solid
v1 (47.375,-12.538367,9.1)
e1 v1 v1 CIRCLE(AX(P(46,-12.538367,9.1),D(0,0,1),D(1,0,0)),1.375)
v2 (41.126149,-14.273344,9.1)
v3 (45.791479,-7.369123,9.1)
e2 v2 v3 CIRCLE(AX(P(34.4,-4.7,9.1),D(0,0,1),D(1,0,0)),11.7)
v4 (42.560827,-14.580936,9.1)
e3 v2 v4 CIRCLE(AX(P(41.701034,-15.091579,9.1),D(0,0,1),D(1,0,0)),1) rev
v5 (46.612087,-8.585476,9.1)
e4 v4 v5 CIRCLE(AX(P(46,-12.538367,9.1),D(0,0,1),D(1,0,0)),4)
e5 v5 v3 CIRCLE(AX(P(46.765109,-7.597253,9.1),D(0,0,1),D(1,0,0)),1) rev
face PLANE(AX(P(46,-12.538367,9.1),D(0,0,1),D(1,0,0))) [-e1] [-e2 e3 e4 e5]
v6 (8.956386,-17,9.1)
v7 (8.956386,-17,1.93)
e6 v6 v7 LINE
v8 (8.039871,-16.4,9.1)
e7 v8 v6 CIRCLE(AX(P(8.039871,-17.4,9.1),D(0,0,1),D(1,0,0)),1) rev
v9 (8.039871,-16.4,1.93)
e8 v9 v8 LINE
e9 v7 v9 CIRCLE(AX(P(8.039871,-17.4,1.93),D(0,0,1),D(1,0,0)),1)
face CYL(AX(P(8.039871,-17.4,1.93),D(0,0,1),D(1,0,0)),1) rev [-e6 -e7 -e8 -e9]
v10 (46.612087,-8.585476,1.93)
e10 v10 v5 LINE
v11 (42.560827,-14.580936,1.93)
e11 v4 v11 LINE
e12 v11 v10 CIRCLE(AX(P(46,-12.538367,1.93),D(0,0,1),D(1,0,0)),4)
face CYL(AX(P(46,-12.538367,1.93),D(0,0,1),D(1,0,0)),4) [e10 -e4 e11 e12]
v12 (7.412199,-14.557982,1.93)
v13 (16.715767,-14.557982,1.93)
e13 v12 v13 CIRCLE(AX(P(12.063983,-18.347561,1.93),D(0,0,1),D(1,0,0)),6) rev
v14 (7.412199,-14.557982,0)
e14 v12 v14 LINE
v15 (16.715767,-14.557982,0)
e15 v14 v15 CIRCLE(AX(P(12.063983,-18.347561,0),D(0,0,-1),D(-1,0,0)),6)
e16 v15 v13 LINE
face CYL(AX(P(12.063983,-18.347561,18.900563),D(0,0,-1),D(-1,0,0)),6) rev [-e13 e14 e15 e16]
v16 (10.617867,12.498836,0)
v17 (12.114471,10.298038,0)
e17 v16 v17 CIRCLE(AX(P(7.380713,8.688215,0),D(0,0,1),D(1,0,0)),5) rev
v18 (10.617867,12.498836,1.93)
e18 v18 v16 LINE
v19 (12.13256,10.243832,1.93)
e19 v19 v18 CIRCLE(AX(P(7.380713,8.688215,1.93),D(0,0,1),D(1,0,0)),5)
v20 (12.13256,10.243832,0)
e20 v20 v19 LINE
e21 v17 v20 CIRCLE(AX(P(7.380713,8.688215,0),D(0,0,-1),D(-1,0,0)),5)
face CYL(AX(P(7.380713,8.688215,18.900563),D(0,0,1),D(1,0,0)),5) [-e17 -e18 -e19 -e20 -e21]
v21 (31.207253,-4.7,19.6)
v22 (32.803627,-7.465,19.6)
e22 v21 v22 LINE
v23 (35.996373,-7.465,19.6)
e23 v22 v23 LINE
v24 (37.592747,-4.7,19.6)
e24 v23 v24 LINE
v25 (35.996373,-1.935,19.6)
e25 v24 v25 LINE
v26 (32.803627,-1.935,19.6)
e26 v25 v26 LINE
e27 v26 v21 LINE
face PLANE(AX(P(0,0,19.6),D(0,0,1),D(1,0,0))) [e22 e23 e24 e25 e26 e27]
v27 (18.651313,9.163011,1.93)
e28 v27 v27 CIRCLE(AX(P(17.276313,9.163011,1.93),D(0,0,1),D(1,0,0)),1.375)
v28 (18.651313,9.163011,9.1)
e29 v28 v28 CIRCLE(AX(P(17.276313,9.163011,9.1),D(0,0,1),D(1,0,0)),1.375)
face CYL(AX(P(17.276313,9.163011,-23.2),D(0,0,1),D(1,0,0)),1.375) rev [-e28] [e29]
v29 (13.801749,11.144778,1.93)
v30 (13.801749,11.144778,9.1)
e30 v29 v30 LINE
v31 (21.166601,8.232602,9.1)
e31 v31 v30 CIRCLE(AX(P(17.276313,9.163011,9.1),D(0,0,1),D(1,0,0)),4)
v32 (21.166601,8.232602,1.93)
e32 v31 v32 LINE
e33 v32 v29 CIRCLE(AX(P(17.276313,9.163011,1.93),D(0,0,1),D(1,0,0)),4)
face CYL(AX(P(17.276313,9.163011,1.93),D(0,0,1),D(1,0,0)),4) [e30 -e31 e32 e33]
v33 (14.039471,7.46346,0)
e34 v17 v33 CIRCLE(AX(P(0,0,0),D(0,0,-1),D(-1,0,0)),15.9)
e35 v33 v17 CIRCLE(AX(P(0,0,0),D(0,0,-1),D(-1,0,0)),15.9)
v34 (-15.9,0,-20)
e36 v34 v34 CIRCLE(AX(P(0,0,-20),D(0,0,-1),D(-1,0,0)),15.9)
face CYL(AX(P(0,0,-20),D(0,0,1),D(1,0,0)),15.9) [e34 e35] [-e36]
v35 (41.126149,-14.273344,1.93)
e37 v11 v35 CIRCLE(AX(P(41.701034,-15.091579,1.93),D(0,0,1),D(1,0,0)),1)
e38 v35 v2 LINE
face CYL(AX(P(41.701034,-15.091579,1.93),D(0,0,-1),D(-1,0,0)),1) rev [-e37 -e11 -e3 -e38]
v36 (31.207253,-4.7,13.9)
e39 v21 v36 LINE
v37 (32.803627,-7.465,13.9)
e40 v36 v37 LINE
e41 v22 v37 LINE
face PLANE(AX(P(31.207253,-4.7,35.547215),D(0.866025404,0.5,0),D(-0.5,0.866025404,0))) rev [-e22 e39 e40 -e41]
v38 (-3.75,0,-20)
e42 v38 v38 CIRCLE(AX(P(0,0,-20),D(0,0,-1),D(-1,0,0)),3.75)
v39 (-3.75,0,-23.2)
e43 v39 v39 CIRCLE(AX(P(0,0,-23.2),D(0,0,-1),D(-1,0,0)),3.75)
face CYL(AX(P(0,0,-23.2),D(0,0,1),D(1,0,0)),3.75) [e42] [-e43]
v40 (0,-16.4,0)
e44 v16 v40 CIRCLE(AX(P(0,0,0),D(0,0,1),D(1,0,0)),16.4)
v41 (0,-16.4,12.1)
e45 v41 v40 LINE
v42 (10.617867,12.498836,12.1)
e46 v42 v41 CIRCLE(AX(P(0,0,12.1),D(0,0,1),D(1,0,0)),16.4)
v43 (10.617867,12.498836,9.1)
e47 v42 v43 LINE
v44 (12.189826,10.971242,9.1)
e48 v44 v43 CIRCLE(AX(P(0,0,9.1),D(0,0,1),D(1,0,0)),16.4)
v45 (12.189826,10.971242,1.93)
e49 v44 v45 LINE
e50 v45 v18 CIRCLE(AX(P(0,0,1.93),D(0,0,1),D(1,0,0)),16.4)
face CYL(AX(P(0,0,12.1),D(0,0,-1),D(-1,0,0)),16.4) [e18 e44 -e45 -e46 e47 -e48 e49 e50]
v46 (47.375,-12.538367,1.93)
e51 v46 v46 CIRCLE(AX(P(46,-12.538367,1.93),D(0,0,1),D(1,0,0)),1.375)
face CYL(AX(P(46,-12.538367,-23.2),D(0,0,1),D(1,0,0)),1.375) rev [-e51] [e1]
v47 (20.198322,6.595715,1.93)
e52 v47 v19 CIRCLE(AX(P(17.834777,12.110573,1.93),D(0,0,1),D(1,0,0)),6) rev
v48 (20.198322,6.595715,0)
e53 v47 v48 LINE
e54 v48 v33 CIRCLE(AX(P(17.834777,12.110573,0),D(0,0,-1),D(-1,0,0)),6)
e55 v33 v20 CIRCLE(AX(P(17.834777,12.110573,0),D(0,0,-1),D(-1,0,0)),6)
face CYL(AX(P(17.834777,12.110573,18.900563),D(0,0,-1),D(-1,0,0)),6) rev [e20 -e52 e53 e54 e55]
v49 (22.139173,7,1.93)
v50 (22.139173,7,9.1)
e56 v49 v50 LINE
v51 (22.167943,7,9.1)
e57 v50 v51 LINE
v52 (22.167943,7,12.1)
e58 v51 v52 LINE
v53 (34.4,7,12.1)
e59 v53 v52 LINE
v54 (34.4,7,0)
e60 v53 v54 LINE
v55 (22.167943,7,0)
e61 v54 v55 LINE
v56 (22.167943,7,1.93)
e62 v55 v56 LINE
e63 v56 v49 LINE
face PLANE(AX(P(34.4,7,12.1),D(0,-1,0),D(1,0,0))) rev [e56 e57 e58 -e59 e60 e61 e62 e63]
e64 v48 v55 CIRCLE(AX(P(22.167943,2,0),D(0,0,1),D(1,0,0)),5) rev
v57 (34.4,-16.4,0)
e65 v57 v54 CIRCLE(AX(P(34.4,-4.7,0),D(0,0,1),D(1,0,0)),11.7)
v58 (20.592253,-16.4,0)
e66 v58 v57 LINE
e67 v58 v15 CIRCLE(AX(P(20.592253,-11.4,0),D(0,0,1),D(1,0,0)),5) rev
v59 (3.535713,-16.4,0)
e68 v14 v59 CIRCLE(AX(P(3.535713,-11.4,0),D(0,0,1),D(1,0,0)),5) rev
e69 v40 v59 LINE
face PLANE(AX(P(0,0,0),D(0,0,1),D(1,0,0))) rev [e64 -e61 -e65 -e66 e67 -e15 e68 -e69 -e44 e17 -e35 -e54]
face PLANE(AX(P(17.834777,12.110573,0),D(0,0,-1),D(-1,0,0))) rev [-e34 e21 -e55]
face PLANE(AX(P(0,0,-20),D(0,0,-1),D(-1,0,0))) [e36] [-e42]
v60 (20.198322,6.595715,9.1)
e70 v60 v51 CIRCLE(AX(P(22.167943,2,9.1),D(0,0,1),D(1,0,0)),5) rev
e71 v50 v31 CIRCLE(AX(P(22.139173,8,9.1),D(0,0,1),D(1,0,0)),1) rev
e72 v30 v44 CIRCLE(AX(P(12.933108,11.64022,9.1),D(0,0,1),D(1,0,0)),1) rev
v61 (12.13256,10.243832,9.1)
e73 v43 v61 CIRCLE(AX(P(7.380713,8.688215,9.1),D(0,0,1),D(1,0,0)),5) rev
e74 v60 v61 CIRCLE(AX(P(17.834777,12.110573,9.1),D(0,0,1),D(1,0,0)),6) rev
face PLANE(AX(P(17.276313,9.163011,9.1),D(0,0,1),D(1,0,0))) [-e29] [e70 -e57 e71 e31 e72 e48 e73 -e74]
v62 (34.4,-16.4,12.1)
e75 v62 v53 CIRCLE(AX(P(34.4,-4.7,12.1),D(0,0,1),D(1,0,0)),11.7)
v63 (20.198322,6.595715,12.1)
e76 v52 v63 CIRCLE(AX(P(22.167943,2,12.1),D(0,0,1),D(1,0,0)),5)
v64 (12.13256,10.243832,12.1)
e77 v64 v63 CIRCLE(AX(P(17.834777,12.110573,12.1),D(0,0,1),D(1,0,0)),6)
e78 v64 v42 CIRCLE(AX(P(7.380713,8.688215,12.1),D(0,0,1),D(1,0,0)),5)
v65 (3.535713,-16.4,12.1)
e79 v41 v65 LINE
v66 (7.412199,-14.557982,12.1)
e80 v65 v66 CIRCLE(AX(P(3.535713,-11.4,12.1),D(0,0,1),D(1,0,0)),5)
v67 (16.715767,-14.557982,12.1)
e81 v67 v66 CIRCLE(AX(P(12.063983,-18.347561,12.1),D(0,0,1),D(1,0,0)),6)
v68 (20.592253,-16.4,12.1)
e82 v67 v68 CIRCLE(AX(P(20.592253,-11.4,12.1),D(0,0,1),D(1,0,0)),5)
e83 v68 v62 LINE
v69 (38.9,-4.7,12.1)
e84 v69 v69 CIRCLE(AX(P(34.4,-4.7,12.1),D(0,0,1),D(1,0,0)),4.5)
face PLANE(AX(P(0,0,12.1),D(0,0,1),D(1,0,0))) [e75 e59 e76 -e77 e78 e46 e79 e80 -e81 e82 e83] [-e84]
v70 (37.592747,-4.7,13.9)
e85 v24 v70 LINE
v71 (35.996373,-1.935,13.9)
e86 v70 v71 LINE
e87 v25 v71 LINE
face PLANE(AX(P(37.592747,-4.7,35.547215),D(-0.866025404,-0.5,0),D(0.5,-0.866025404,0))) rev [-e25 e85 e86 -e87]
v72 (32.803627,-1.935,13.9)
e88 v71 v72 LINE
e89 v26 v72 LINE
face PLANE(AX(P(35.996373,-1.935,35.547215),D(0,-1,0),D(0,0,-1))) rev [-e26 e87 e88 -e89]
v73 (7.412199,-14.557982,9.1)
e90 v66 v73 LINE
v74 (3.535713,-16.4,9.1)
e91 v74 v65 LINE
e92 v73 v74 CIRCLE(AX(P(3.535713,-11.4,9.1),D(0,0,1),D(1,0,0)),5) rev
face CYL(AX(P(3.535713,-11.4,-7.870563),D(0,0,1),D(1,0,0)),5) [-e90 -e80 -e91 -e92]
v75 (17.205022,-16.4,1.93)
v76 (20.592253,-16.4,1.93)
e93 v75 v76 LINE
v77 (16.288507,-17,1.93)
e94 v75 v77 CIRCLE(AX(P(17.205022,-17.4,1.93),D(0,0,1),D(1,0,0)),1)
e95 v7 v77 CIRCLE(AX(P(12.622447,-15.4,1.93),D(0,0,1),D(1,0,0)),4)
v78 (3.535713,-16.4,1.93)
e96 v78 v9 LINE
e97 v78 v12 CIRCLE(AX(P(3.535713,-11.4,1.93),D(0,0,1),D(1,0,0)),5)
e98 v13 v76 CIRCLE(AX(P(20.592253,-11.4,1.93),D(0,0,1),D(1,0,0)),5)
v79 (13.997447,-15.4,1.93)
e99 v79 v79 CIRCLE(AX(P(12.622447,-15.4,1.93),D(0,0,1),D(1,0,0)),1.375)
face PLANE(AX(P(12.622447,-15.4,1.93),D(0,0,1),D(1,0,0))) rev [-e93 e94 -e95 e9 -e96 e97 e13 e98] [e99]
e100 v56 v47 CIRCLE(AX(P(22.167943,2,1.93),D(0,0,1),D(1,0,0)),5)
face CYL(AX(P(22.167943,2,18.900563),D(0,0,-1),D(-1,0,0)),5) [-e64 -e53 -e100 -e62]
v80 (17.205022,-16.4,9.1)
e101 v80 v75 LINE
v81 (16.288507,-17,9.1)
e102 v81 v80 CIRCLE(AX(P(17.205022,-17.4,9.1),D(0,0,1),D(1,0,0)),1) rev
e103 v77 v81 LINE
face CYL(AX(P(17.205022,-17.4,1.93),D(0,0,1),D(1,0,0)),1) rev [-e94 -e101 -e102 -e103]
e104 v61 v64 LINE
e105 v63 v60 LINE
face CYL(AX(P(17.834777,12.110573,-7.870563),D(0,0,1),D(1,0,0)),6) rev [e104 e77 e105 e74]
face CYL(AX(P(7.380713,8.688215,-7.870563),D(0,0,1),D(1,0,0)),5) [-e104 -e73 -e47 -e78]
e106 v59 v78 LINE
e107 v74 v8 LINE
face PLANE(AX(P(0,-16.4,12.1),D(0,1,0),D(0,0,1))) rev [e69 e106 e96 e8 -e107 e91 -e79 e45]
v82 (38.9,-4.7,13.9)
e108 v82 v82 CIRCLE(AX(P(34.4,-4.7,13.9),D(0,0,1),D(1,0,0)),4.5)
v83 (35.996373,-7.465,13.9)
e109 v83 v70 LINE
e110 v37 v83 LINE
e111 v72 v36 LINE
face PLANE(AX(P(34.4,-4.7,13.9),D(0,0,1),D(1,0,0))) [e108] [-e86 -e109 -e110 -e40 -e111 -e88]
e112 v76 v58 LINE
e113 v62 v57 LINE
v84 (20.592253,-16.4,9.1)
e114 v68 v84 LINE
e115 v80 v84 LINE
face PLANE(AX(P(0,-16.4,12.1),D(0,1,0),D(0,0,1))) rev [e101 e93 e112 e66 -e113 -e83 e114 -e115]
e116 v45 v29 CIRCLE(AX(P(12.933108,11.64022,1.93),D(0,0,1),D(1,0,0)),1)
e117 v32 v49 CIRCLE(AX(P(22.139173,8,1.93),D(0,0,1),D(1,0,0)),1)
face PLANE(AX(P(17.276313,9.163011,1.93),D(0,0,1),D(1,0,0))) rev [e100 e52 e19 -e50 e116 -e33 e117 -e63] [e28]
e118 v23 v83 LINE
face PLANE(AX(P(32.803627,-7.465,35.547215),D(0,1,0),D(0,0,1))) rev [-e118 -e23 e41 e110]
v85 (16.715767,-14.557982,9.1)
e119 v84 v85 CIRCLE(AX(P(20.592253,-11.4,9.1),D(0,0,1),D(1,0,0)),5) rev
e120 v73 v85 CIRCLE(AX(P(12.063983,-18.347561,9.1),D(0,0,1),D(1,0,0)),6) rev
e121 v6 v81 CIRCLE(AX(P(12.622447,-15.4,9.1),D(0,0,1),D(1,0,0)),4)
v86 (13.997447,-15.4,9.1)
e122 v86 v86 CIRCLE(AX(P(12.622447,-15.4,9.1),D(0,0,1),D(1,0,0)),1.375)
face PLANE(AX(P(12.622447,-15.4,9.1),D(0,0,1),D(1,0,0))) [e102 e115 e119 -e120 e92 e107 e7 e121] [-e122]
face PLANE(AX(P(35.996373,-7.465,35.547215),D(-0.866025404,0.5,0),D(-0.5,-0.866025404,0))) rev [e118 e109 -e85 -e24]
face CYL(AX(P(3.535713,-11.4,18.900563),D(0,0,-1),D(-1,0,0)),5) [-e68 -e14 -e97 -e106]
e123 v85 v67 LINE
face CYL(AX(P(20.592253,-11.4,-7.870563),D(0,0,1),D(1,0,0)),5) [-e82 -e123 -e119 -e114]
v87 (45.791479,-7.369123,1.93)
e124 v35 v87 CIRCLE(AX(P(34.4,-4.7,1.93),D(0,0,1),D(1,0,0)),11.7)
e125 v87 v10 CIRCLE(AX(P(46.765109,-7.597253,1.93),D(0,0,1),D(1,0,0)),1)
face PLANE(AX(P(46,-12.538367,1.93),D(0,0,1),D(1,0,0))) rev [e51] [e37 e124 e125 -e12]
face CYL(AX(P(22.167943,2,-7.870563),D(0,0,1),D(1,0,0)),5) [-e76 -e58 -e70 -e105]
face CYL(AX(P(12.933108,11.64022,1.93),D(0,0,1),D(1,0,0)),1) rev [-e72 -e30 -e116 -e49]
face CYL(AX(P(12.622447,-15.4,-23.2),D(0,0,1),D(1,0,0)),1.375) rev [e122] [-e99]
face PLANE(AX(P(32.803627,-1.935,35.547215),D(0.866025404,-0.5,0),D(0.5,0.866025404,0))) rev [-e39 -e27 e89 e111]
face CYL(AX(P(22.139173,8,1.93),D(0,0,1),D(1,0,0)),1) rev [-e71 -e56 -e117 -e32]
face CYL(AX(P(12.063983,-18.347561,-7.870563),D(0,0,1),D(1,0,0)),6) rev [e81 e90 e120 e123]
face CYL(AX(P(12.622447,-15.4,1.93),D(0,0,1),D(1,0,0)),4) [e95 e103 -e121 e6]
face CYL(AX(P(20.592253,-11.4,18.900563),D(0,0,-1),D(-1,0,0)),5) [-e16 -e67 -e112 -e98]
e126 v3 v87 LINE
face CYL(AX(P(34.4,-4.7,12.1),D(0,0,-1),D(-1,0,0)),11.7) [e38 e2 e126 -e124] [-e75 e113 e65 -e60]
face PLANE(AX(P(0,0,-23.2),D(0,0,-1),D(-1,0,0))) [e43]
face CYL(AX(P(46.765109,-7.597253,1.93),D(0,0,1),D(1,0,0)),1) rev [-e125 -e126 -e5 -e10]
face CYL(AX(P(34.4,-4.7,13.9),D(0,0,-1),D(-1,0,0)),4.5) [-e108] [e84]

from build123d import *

# Parameters (mm, degrees)
BOSS_EXTRUDE1_DEPTH = 12.1
SKETCH2_R           = 4
BOSS_EXTRUDE2_DEPTH = 7.17
SKETCH3_R           = 15.9
BOSS_EXTRUDE3_DEPTH = 20
SKETCH4_R           = 3.75
BOSS_EXTRUDE4_DEPTH = 3.2
SKETCH5_R           = 4.5
BOSS_EXTRUDE5_DEPTH = 1.8
BOSS_EXTRUDE6_DEPTH = 5.7
SKETCH8_R           = 6
CUT_EXTRUDE2_DEPTH  = 3
SKETCH7_R           = 1.375
CUT_EXTRUDE1_DEPTH  = 63.607108223
CUT_EXTRUDE3_START  = -1.93
SKETCH9_R           = 6
CUT_EXTRUDE3_DEPTH  = 1.93
FILLET1_R           = 1
FILLET2_R           = 5


with BuildPart() as part:
    # Sketch1 → Boss-Extrude1 (new body)
    with BuildSketch(Plane.XY):
        with BuildLine():
            Line((0, -16.4), (34.4, -16.4))
            ThreePointArc((34.4, -16.4), (46.1, -4.7), (34.4, 7))
            Line((34.4, 7), (14.831048513, 7))
            ThreePointArc((14.831048513, 7), (-13.852075657, 8.779521627), (0, -16.4))
        make_face()
    extrude(amount=BOSS_EXTRUDE1_DEPTH)

    # Sketch2 → Boss-Extrude2 (add)
    with BuildSketch(Plane.XY.offset(9.1)):
        with Locations((17.276313416, 9.163011328)):
            Circle(SKETCH2_R)
        with Locations((46, -12.538367177)):
            Circle(SKETCH2_R)
        with Locations((12.6224468, -15.4)):
            Circle(SKETCH2_R)
    extrude(amount=-BOSS_EXTRUDE2_DEPTH)

    # Sketch3 → Boss-Extrude3 (add)
    with BuildSketch(Plane(origin=(0, 0, 0), x_dir=(-1, 0, 0), z_dir=(0, 0, -1))):
        Circle(SKETCH3_R)
    extrude(amount=BOSS_EXTRUDE3_DEPTH)

    # Sketch4 → Boss-Extrude4 (add)
    with BuildSketch(Plane(origin=(0, 0, -20), x_dir=(-1, 0, 0), z_dir=(0, 0, -1))):
        Circle(SKETCH4_R)
    extrude(amount=BOSS_EXTRUDE4_DEPTH)

    # Sketch5 → Boss-Extrude5 (add)
    with BuildSketch(Plane.XY.offset(12.1)):
        with Locations((34.4, -4.7)):
            Circle(SKETCH5_R)
    extrude(amount=BOSS_EXTRUDE5_DEPTH)

    # Sketch6 → Boss-Extrude6 (add)
    with BuildSketch(Plane.XY.offset(13.9)):
        Polygon((35.996373494, -7.465), (37.592746989, -4.7), (35.996373494, -1.935), (32.803626506, -1.935), (31.207253011, -4.7), (32.803626506, -7.465), align=None)
    extrude(amount=BOSS_EXTRUDE6_DEPTH)

    # Sketch8 → Cut-Extrude2 (cut)
    with BuildSketch(Plane.XY.offset(12.1)):
        with Locations((17.83477741, 12.110572688)):
            Circle(SKETCH8_R)
        with Locations((12.063982807, -18.347561359)):
            Circle(SKETCH8_R)
    extrude(amount=-CUT_EXTRUDE2_DEPTH, mode=Mode.SUBTRACT)

    # Sketch7 → Cut-Extrude1 (cut, through all)
    with BuildSketch(Plane.XY.offset(9.1)):
        with Locations((17.276313416, 9.163011328)):
            Circle(SKETCH7_R)
        with Locations((46, -12.538367177)):
            Circle(SKETCH7_R)
        with Locations((12.6224468, -15.4)):
            Circle(SKETCH7_R)
    extrude(amount=-CUT_EXTRUDE1_DEPTH, mode=Mode.SUBTRACT)

    # Sketch9 → Cut-Extrude3 (cut)
    with BuildSketch(Plane(origin=(0, 0, 0), x_dir=(-1, 0, 0), z_dir=(0, 0, -1)).offset(CUT_EXTRUDE3_START)):
        with Locations((-12.063982807, -18.347561359)):
            Circle(SKETCH9_R)
        with Locations((-17.83477741, 12.110572688)):
            Circle(SKETCH9_R)
    extrude(amount=CUT_EXTRUDE3_DEPTH, mode=Mode.SUBTRACT)

    # Fillet1
    # the kernel refuses this fillet: 1 mm, written as the material it adds along each edge
    with BuildSketch(Plane(origin=(8.749463454, -16.4, 1.93), x_dir=(-1, 0, 0), z_dir=(0, 0, 1))) as fillet1_piece_1:
        with BuildLine():
            CenterArc((0.709592349, 1), FILLET1_R, 203.578178478, 66.421821522)
            ThreePointArc((-0.20692279, 0.6), (-0.091542385, 0.304110525), (0, 0))
            Line((0, 0), (0.709592349, 0))
        make_face()
    extrude(amount=7.17)
    with BuildSketch(Plane(origin=(16.495430147, -16.4, 1.93), x_dir=(1, 0, 0), z_dir=(0, 0, 1))) as fillet1_piece_2:
        with BuildLine():
            CenterArc((0.709592349, -1), FILLET1_R, 90, 66.421821522)
            ThreePointArc((-0.20692279, -0.6), (-0.091542385, -0.304110525), (0, 0))
            Line((0, 0), (0.709592349, 0))
        make_face()
    extrude(amount=7.17)
    with BuildSketch(Plane(origin=(42.116078953, -13.495005719, 9.1), x_dir=(-0.786111356647784, -0.6180848929955987, 0), z_dir=(0, 0, -1))) as fillet1_piece_3:
        with BuildLine():
            CenterArc((1.313089389, -0.998550915), FILLET1_R, 93.084870556, 94.384925022)
            ThreePointArc((0.321575856, -1.128554433), (0.202398335, -0.552420542), (0, 0))
            ThreePointArc((0, 0), (0.629637125, -0.016954289), (1.25927425, 0))
        make_face()
    extrude(amount=7.17)
    with BuildSketch(Plane(origin=(45.438635333, -8.577954356, 9.1), x_dir=(0.2801956563205793, 0.959942911937517, 0), z_dir=(0, 0, -1))) as fillet1_piece_4:
        with BuildLine():
            CenterArc((1.313089389, 0.998550915), FILLET1_R, 172.530204422, 94.384925022)
            ThreePointArc((0.321575856, 1.128554433), (0.202398335, 0.552420542), (0, 0))
            ThreePointArc((0, 0), (0.629637125, 0.016954289), (1.25927425, 0))
        make_face()
    extrude(amount=7.17)
    with BuildSketch(Plane(origin=(13.299776183, 9.595621579, 9.1), x_dir=(-0.6279509963726487, 0.7782528805951172, 0), z_dir=(0, 0, -1))) as fillet1_piece_5:
        with BuildLine():
            CenterArc((1.821464626, 0.998546906), FILLET1_R, 158.597997632, 108.312865848)
            ThreePointArc((0.890421562, 1.363456228), (0.515330012, 0.635935903), (0, 0))
            ThreePointArc((0, 0), (0.88378757, 0.023830743), (1.76757514, 0))
        make_face()
    extrude(amount=7.17)
    with BuildSketch(Plane(origin=(20.641039556, 7, -1.81533395), x_dir=(1, 0, 0), z_dir=(0, 0, 1))) as fillet1_piece_6_section:
        with BuildLine():
            CenterArc((1.49813358, 1), FILLET1_R, 166.549673426, 103.450326574)
            ThreePointArc((0.525561636, 1.232602266), (0.314762115, 0.59413715), (0, 0))
            Line((0, 0), (1.49813358, 0))
        make_face()
    fillet1_piece_6 = extrude(amount=10.91533395, mode=Mode.PRIVATE)
    fillet1_piece_6 = fillet1_piece_6 - Plane(origin=(17.83477741, 12.110572688, 0.965), x_dir=(-1, 0, 0), z_dir=(0, 0, 1)) * Cylinder(6, 28, mode=Mode.PRIVATE)
    fillet1_piece_6 = split(fillet1_piece_6, bisect_by=Plane(origin=(21.45614867, 7.07760615, 0), z_dir=(0, 0, 1)), keep=Keep.TOP, mode=Mode.PRIVATE)
    fillet1_piece_6 = split(fillet1_piece_6, bisect_by=Plane(origin=(21.45614867, 7.07760615, 1.93), z_dir=(0, 0, -1)), keep=Keep.TOP, mode=Mode.PRIVATE)
    add(fillet1_piece_6)
    with BuildSketch(Plane(origin=(20.641039556, 7, 1.93), x_dir=(1, 0, 0), z_dir=(0, 0, 1))) as fillet1_piece_7_section:
        with BuildLine():
            CenterArc((1.49813358, 1), FILLET1_R, 166.549673426, 103.450326574)
            ThreePointArc((0.525561636, 1.232602266), (0.314762115, 0.59413715), (0, 0))
            Line((0, 0), (1.49813358, 0))
        make_face()
    fillet1_piece_7 = extrude(amount=7.17, mode=Mode.PRIVATE)
    fillet1_piece_7 = fillet1_piece_7 - Plane(origin=(17.83477741, 12.110572688, 5.515), x_dir=(-1, 0, 0), z_dir=(0, 0, 1)) * Cylinder(6, 21, mode=Mode.PRIVATE)
    add(fillet1_piece_7)
    with BuildSketch(Plane(origin=(20.641039556, 7, 1.93), x_dir=(1, 0, 0), z_dir=(0, 0, 1))) as fillet1_piece_8_section:
        with BuildLine():
            CenterArc((1.49813358, 1), FILLET1_R, 166.549673426, 103.450326574)
            ThreePointArc((0.525561636, 1.232602266), (0.314762115, 0.59413715), (0, 0))
            Line((0, 0), (1.49813358, 0))
        make_face()
    fillet1_piece_8 = extrude(amount=7.17, mode=Mode.PRIVATE)
    fillet1_piece_8 = fillet1_piece_8 & Plane(origin=(17.83477741, 12.110572688, 5.515), x_dir=(-1, 0, 0), z_dir=(0, 0, 1)) * Cylinder(6, 21, mode=Mode.PRIVATE)
    add(fillet1_piece_8)
    with BuildSketch(Plane(origin=(20.641039556, 7, 1.93), x_dir=(1, 0, 0), z_dir=(0, 0, 1))) as fillet1_piece_9_section:
        with BuildLine():
            CenterArc((1.49813358, 1), FILLET1_R, 166.549673426, 103.450326574)
            ThreePointArc((0.525561636, 1.232602266), (0.314762115, 0.59413715), (0, 0))
            Line((0, 0), (1.49813358, 0))
        make_face()
    fillet1_piece_9 = extrude(amount=10.91533395, mode=Mode.PRIVATE)
    fillet1_piece_9 = fillet1_piece_9 - Plane(origin=(17.83477741, 12.110572688, 10.6), x_dir=(-1, 0, 0), z_dir=(0, 0, 1)) * Cylinder(6, 28, mode=Mode.PRIVATE)
    fillet1_piece_9 = split(fillet1_piece_9, bisect_by=Plane(origin=(21.45614867, 7.07760615, 9.1), z_dir=(0, 0, 1)), keep=Keep.TOP, mode=Mode.PRIVATE)
    fillet1_piece_9 = split(fillet1_piece_9, bisect_by=Plane(origin=(21.45614867, 7.07760615, 12.1), z_dir=(0, 0, -1)), keep=Keep.TOP, mode=Mode.PRIVATE)
    add(fillet1_piece_9)

    # Fillet2
    # the kernel refuses this fillet: 5 mm, written as the material it takes off along each edge
    with BuildSketch(Plane(origin=(17.739104369, -16.4, -7.132871381), x_dir=(-0.4856410354617555, 0.8741583292948903, 0), z_dir=(0, 0, 1))) as fillet2_piece_1:
        with BuildLine():
            CenterArc((2.985185629, -4.922308749), FILLET2_R, 100.113527083, 50.831993071)
            Line((-1.385606017, -2.494103572), (0, 0))
            ThreePointArc((0, 0), (1.053594928, -0.093229501), (2.107189856, 0))
        make_face()
    extrude(amount=9.062871381, mode=Mode.SUBTRACT)
    with BuildSketch(Plane(origin=(6.388861244, -16.4, -7.132871381), x_dir=(-1, 0, 0), z_dir=(0, 0, 1))) as fillet2_piece_2:
        with BuildLine():
            CenterArc((2.853148552, -5), FILLET2_R, 90, 50.831993071)
            ThreePointArc((-1.023337864, -1.842017564), (-0.430171587, -0.966284853), (0, 0))
            Line((0, 0), (2.853148552, 0))
        make_face()
    extrude(amount=9.062871381, mode=Mode.SUBTRACT)
    with BuildSketch(Plane(origin=(17.739104369, -16.4, 9.1), x_dir=(-0.4856410354617568, 0.8741583292948896, 0), z_dir=(0, 0, 1))) as fillet2_piece_3:
        with BuildLine():
            CenterArc((2.985185629, -4.922308749), FILLET2_R, 100.113527083, 50.831993071)
            Line((-1.385606017, -2.494103572), (0, 0))
            ThreePointArc((0, 0), (1.053594928, -0.093229501), (2.107189856, 0))
        make_face()
    extrude(amount=10.132871381, mode=Mode.SUBTRACT)
    with BuildSketch(Plane(origin=(6.388861244, -16.4, 9.1), x_dir=(-1, 0, 0), z_dir=(0, 0, 1))) as fillet2_piece_4:
        with BuildLine():
            CenterArc((2.853148552, -5), FILLET2_R, 90, 50.831993071)
            ThreePointArc((-1.023337864, -1.842017564), (-0.430171587, -0.966284853), (0, 0))
            Line((0, 0), (2.853148552, 0))
        make_face()
    extrude(amount=10.132871381, mode=Mode.SUBTRACT)
    with BuildSketch(Plane(origin=(11.890467167, 11.294989621, 1.93), x_dir=(-0.7264583233980587, 0.6872105240504408, 0), z_dir=(0, 0, -1))) as fillet2_piece_5:
        with BuildLine():
            CenterArc((1.484745631, -4.99286384), FILLET2_R, 86.938483712, 31.524868326)
            ThreePointArc((-0.898237104, -0.597253156), (-0.435669612, -0.318853072), (0, 0))
            ThreePointArc((0, 0), (0.875893106, 0.023406604), (1.751786212, 0))
        make_face()
    extrude(amount=1.93, mode=Mode.SUBTRACT)
    with BuildSketch(Plane(origin=(21.423177854, 7.301894881, -3.534616353), x_dir=(0.9267551866460263, -0.37566584090743305, 0), z_dir=(0, 0, 1))) as fillet2_piece_6:
        with BuildLine():
            CenterArc((2.681955321, -4.633775933), FILLET2_R, 112.065471844, 23.198889906)
            Line((-0.869853786, -1.114592496), (-1.225034697, -0.762674153))
            ThreePointArc((-1.225034697, -0.762674153), (-0.796151939, -0.275387861), (-0.427668726, 0.259035636))
            Line((-0.427668726, 0.259035636), (0.200649047, 0.457973755))
            ThreePointArc((0.200649047, 0.457973755), (0.589131014, 0.452569916), (0.615793196, 0.463377593))
            Line((0.615793196, 0.463377593), (0.803626117, 0))
        make_face()
    extrude(amount=5.464616353, mode=Mode.SUBTRACT)
    with BuildSketch(Plane(origin=(21.423177854, 7.301894881, 15.634616353), x_dir=(0.9267551866460257, -0.3756658409074346, 0), z_dir=(0, 0, -1))) as fillet2_piece_7:
        with BuildLine():
            CenterArc((2.681955321, 4.633775933), FILLET2_R, 224.73563825, 23.198889906)
            Line((-0.869853786, 1.114592496), (-1.225034697, 0.762674153))
            ThreePointArc((-1.225034697, 0.762674153), (-0.796151939, 0.275387861), (-0.427668726, -0.259035636))
            Line((-0.427668726, -0.259035636), (0.200649047, -0.457973755))
            ThreePointArc((0.200649047, -0.457973755), (0.589131014, -0.452569916), (0.615793196, -0.463377593))
            Line((0.615793196, -0.463377593), (0.803626117, 0))
        make_face()
    extrude(amount=6.534616353, mode=Mode.SUBTRACT)
    with BuildSketch(Plane(origin=(11.890467167, 11.294989621, 16.479465531), x_dir=(-0.7264583233980683, 0.6872105240504307, 0), z_dir=(0, 0, -1))) as fillet2_piece_8:
        with BuildLine():
            CenterArc((1.484745631, -4.99286384), FILLET2_R, 86.938483712, 31.524868326)
            ThreePointArc((-0.898237104, -0.597253156), (-0.435669612, -0.318853072), (0, 0))
            ThreePointArc((0, 0), (0.875893106, 0.023406604), (1.751786212, 0))
        make_face()
    extrude(amount=7.379465531, mode=Mode.SUBTRACT)


solid = part.part
